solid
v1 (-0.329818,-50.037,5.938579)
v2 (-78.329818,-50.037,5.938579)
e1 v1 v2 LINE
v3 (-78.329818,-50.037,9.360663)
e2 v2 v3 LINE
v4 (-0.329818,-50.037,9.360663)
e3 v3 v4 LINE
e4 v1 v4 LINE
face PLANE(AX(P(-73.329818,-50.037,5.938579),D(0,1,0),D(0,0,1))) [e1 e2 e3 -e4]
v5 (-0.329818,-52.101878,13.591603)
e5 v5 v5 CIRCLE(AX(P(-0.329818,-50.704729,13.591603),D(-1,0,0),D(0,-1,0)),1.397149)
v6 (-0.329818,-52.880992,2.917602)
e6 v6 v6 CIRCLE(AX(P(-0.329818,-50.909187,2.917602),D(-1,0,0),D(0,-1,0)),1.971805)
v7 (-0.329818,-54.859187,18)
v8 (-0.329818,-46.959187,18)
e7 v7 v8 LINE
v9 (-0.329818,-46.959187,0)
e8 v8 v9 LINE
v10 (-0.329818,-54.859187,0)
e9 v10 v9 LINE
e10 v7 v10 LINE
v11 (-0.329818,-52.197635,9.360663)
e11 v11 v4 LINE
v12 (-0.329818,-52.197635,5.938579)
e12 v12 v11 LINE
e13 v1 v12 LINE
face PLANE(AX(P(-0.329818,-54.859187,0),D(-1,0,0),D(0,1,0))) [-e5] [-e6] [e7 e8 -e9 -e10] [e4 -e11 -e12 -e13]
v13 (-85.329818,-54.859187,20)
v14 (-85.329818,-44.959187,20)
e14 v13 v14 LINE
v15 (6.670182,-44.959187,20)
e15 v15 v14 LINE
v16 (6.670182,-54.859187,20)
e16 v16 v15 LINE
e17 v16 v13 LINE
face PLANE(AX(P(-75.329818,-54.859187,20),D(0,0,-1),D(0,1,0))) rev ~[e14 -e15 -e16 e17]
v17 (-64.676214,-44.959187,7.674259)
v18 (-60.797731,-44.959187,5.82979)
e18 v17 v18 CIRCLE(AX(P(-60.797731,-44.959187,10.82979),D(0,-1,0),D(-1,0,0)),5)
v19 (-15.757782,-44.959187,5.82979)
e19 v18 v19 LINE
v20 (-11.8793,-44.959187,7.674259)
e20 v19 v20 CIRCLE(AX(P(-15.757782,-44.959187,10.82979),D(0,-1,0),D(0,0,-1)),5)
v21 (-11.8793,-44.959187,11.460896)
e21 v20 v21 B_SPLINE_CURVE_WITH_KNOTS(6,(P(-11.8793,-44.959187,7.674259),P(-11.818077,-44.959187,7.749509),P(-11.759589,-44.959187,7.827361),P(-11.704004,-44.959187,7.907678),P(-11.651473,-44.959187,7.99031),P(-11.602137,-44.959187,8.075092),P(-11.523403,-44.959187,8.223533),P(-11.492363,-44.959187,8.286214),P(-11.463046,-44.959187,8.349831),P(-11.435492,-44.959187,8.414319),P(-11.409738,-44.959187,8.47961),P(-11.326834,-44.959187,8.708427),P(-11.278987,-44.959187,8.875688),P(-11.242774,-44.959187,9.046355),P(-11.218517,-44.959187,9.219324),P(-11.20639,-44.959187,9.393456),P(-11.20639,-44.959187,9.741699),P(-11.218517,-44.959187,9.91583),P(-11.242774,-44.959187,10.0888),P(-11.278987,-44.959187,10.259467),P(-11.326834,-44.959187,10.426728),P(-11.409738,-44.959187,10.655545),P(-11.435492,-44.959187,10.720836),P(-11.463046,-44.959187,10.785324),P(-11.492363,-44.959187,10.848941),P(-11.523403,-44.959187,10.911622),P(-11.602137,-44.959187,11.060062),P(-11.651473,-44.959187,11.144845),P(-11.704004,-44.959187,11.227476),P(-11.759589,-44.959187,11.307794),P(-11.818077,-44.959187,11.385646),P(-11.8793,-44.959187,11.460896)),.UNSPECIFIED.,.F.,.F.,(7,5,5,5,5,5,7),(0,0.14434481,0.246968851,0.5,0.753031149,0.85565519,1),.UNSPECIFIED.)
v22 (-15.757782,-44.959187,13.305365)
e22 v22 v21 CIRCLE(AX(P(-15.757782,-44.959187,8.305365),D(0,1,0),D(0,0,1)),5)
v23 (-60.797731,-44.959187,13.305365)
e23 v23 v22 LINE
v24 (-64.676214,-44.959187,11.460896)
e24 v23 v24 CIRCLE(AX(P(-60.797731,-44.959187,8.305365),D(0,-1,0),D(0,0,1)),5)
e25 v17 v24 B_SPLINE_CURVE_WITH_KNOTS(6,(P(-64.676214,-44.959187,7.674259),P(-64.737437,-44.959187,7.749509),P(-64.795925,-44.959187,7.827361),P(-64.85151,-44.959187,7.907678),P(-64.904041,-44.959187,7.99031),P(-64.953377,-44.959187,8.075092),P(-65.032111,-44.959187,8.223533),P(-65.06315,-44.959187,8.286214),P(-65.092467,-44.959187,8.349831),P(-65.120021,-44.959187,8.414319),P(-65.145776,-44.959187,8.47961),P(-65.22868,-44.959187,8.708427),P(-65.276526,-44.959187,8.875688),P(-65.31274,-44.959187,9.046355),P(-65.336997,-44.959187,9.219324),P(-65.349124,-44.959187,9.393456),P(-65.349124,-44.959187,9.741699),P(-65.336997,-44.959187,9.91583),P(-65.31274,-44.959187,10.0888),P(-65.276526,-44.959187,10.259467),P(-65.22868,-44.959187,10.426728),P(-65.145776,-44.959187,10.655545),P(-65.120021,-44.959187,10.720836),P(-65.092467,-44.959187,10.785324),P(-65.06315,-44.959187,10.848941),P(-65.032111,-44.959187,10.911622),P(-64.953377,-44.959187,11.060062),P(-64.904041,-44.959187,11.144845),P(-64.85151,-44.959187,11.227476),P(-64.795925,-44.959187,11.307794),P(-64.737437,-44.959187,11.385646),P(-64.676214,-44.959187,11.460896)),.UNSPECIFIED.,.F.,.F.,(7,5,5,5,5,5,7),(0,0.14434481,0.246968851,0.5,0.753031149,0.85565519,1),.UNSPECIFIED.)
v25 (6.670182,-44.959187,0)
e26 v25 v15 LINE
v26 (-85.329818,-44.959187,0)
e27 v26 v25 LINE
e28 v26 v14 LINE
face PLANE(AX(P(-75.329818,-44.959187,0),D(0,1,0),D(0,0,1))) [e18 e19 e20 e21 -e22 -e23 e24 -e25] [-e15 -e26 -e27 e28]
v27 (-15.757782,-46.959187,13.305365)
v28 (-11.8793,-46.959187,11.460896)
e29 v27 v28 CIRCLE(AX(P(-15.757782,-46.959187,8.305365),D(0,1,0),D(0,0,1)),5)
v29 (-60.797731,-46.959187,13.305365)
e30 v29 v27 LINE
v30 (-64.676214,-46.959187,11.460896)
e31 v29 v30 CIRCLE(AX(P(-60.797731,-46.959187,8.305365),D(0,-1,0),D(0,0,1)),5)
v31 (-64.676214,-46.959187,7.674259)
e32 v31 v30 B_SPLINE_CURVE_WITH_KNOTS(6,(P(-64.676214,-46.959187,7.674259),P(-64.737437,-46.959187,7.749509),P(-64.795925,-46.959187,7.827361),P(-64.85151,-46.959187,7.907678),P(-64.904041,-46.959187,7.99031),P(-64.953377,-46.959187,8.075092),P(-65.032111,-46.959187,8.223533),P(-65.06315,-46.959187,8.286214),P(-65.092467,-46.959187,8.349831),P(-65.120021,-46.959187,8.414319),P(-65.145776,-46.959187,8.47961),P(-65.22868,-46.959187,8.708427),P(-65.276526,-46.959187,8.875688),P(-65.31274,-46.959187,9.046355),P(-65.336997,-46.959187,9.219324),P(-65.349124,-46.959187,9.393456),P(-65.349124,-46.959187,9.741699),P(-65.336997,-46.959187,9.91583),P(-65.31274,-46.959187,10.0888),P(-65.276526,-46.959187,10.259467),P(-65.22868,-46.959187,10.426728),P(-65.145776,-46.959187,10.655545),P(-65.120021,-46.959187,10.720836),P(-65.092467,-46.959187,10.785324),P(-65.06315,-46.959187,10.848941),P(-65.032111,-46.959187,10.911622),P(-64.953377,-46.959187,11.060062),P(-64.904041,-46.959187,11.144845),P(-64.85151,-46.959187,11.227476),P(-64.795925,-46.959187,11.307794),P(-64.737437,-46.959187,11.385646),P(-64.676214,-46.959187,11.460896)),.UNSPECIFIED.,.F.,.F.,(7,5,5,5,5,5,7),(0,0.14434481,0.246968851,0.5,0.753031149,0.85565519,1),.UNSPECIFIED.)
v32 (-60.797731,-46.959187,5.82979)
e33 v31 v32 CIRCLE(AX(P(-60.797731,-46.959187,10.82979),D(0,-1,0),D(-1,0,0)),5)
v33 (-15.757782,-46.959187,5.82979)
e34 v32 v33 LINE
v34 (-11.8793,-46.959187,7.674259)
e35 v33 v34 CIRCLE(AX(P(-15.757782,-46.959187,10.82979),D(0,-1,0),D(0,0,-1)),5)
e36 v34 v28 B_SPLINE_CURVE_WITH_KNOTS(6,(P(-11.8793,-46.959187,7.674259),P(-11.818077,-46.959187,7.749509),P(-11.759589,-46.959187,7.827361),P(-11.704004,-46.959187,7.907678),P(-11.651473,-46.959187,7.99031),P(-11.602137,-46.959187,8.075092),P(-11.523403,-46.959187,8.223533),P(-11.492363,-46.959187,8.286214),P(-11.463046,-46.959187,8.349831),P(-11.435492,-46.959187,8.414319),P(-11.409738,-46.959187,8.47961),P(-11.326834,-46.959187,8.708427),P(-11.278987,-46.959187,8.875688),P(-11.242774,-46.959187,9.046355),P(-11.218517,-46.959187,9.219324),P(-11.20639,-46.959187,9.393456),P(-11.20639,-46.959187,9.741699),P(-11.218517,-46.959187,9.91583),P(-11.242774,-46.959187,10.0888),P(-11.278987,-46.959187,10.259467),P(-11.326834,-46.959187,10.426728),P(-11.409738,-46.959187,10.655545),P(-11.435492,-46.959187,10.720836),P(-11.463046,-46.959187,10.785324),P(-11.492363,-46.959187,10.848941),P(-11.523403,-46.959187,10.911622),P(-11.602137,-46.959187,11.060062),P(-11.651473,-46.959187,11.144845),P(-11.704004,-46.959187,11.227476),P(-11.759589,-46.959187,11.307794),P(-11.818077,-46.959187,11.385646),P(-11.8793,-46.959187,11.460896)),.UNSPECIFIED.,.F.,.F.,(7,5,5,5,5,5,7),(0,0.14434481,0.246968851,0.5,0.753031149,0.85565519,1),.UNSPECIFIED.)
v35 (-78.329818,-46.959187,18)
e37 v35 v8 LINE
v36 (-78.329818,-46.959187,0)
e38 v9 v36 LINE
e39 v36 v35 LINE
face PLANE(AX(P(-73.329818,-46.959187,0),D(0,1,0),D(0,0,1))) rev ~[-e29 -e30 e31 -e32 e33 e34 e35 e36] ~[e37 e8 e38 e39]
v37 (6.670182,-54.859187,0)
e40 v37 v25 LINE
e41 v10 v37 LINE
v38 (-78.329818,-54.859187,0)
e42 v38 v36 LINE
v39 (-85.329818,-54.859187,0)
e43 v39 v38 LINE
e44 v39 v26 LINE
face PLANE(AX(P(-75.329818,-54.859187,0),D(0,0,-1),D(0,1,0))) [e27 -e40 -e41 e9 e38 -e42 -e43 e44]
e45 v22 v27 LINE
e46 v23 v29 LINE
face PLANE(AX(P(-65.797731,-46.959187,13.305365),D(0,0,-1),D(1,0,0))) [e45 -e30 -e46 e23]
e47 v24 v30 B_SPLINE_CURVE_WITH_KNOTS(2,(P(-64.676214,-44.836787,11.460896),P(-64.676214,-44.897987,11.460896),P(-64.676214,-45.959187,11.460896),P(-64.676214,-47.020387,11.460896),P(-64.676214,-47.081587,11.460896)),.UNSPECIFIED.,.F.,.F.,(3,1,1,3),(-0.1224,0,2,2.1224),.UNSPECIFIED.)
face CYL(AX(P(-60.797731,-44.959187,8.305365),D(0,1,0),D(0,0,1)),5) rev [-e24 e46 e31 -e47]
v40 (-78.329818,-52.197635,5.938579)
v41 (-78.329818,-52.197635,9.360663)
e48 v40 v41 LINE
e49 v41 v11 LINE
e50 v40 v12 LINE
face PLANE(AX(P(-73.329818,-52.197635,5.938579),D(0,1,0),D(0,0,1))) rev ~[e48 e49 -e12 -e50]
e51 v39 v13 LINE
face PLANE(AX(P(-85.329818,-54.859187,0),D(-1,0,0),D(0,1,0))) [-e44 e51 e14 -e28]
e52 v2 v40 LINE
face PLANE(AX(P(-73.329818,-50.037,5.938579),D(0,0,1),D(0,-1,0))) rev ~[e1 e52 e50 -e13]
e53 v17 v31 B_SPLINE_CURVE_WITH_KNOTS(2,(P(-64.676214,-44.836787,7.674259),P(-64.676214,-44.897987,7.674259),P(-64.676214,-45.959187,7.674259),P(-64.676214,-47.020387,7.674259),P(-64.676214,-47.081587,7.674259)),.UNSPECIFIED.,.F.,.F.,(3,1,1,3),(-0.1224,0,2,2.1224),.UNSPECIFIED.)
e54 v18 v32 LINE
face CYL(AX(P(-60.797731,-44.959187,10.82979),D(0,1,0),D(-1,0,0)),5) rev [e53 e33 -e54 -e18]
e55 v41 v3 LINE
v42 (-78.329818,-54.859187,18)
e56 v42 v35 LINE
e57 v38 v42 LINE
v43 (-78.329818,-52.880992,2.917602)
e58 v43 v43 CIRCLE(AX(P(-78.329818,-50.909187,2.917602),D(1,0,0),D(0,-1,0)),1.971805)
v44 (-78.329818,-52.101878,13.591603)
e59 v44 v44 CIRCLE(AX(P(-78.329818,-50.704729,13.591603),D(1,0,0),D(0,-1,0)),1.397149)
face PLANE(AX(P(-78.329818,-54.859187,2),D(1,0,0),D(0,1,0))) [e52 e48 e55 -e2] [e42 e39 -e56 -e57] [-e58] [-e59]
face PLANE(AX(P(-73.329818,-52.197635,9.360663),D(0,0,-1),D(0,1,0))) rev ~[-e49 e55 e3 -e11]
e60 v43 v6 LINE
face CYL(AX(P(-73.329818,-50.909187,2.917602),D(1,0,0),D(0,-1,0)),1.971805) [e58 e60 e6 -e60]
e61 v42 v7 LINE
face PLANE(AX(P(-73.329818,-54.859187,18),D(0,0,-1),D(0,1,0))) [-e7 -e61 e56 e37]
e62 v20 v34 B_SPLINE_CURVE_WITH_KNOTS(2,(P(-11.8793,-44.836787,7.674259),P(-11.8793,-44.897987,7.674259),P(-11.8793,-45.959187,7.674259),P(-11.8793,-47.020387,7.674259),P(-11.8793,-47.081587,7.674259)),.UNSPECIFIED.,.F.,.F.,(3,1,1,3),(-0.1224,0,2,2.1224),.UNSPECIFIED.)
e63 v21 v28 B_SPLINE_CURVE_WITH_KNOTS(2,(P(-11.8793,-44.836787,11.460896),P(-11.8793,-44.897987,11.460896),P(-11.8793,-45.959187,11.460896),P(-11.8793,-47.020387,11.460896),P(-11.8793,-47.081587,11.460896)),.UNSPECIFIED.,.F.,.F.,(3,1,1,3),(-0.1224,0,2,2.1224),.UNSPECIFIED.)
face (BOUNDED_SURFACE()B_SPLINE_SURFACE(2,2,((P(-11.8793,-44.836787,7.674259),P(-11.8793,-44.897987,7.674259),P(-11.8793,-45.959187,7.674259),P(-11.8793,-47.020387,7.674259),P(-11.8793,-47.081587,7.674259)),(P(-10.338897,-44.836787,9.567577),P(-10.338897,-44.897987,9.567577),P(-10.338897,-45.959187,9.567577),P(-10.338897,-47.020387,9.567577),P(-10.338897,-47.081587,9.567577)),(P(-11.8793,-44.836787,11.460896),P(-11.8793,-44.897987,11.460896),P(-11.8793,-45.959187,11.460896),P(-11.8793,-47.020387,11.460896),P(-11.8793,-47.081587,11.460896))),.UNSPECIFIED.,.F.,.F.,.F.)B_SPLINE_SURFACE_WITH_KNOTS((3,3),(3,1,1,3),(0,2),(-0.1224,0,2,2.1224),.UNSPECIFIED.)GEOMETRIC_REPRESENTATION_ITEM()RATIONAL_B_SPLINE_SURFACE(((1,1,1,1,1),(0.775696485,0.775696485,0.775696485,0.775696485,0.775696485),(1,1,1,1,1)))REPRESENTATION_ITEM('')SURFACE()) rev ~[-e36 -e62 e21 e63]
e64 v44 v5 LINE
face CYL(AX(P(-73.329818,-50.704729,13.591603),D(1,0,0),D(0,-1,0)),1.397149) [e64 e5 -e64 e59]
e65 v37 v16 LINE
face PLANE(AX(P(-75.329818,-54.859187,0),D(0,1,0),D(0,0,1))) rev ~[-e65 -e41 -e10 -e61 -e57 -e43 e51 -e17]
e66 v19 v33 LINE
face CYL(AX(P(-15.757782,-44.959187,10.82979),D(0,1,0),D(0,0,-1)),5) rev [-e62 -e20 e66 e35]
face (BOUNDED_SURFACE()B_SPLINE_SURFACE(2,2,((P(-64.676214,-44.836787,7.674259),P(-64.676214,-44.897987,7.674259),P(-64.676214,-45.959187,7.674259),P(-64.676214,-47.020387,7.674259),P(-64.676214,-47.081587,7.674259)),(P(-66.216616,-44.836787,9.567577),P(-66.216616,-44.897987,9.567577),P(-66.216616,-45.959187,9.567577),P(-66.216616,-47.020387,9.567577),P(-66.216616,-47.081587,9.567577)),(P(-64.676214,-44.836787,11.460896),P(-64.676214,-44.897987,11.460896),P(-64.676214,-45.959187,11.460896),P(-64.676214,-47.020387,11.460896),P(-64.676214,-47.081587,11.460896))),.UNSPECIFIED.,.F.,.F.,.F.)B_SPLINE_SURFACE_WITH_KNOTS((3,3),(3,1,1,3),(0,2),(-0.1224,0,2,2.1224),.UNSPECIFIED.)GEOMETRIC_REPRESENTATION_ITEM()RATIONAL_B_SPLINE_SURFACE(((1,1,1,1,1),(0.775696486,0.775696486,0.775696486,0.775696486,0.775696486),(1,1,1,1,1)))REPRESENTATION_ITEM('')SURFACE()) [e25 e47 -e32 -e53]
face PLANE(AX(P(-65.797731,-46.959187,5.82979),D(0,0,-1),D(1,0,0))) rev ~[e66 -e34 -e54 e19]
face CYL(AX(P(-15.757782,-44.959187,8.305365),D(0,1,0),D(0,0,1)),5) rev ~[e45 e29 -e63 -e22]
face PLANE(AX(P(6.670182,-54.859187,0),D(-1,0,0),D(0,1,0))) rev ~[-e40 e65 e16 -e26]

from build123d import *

# Parameters (mm, degrees)
F0_W         = 82
F0_H         = 9.9
F1_DEPTH     = 20
F2_T         = -2
F3_DEPTH     = 2
F4_DEPTH     = 5
F6_R         = 1.3971487494
F5_R         = 1.9718048452
F7_DEPTH     = 74
F8_W         = 55.0399487838
F8_H         = 7.4755754322
F9_DEPTH     = 2
F10_T1_DEPTH = 2
F11_R        = 3
F12_W        = 1.8215961754
F12_H        = 3.4220837988
F13_DEPTH    = 1
F14_T4_DEPTH = 3.4220837988
F14_T9_DEPTH = 3.4220837988
F15_R        = 0.7
F16_W        = 0.433061509
F16_H        = 3.4220837988
F16_W_2      = 1.2856977906
F16_W_3      = 0.4418755459
F17_DEPTH    = 73
F19_DEPTH    = 10
F20_DEPTH    = 5


# Not quite as in the source:
# - a fillet or chamfer that OpenCascade refuses, or shapes differently, is made with other operations: its cross-section is extruded or revolved along the edge and cut away or added
# - a feature of the source that left no trace in its solid (it failed there, or was rolled back) is left out


with BuildPart() as f1:
    # F0 (on Top) → F1 (new body)
    with BuildSketch(Plane.XY):
        with Locations((-34.3298178315, -49.909187454)):
            Rectangle(F0_W, F0_H)
    extrude(amount=F1_DEPTH)

    # F2
    f2_openings = [f1.faces().sort_by_distance(p)[0] for p in [
        (-34.329818, -54.859187, 10),
    ]]
    offset(amount=F2_T, openings=f2_openings)

    # F3 (cut): a face of the model
    f3_faces = [f1.faces().sort_by_distance(p)[0] for p in [
        (-34.3298178315, -50.909187454, 2),
    ]]
    extrude(f3_faces, amount=-F3_DEPTH, mode=Mode.SUBTRACT)

    # F4 (add): a face of the model
    f4_faces = [f1.faces().sort_by_distance(p)[0] for p in [
        (4.6701821685, -50.909187454, 9),
    ]]
    extrude(f4_faces, amount=F4_DEPTH)

    # F6 (on face) + F5 (on face) → F7 (join)
    with BuildSketch(Plane(origin=(-0.3298178315, 0, 0), x_dir=(0, -1, 0), z_dir=(-1, 0, 0))):
        with Locations((50.704728812, 13.591603376)):
            Circle(F6_R)
    with BuildSketch(Plane(origin=(-0.3298178315, 0, 0), x_dir=(0, -1, 0), z_dir=(-1, 0, 0))):
        with Locations((50.909187454, 2.9176021926)):
            Circle(F5_R)
    extrude(amount=F7_DEPTH)

    # F8 (on face) → F9 (cut)
    with BuildSketch(Plane.XZ.offset(46.959187454)):
        with Locations((-38.2777568884, 9.5675773919)):
            Rectangle(F8_W, F8_H)
    extrude(amount=-F9_DEPTH, mode=Mode.SUBTRACT)

    # F10: fillet of radius 5 on 4 edges, made by hand

    # F10_s2 → F10_t1 (join)
    with BuildSketch(Plane.XZ.offset(44.959187454)):
        with BuildLine():
            ThreePointArc((-15.7577824965, 5.8297896758), (-12.2222485906, 7.2942557698), (-10.7577824965, 10.8297896758))
            Line((-10.7577824965, 10.8297896758), (-10.7577824965, 5.8297896758))
            Line((-10.7577824965, 5.8297896758), (-15.7577824965, 5.8297896758))
        make_face()
        with BuildLine():
            ThreePointArc((-65.7977312803, 10.8297896758), (-64.3332651863, 7.2942557698), (-60.7977312803, 5.8297896758))
            Line((-60.7977312803, 5.8297896758), (-65.7977312803, 5.8297896758))
            Line((-65.7977312803, 5.8297896758), (-65.7977312803, 10.8297896758))
        make_face()
        with BuildLine():
            ThreePointArc((-60.7977312803, 13.305365108), (-64.3332651863, 11.8408990139), (-65.7977312803, 8.305365108))
            Line((-65.7977312803, 8.305365108), (-65.7977312803, 13.305365108))
            Line((-65.7977312803, 13.305365108), (-60.7977312803, 13.305365108))
        make_face()
        with BuildLine():
            ThreePointArc((-15.7577824965, 13.305365108), (-12.2222485906, 11.8408990139), (-10.7577824965, 8.305365108))
            Line((-10.7577824965, 8.305365108), (-10.7577824965, 13.305365108))
            Line((-10.7577824965, 13.305365108), (-15.7577824965, 13.305365108))
        make_face()
    extrude(amount=F10_T1_DEPTH)

    # F11
    f11_edges = [f1.edges().sort_by_distance(p)[0] for p in [
        (-10.919723, -45.959187, 9.567577),
        (-65.635791, -45.959187, 9.567577),
    ]]
    fillet(f11_edges, radius=F11_R)

    # F12 (on face) → F13 (join)
    with BuildSketch(Plane(origin=(-0.3298178315, 0, 0), x_dir=(0, -1, 0), z_dir=(-1, 0, 0))):
        with Locations((51.1129107326, 7.6496207621)):
            Rectangle(F12_W, F12_H)
    extrude(amount=F13_DEPTH)

    # F14: fillet of radius 2 on 2 edges, made by hand


with BuildPart() as f14_tool2:
    # F14_s3 → F14_t4 (new body)
    with BuildSketch(Plane.XY.offset(5.9385788627)):
        with BuildLine():
            ThreePointArc((0.6701821685, -52.0237088203), (-0.7440313939, -51.4379223827), (-1.3298178315, -50.0237088203))
            Line((-1.3298178315, -50.0237088203), (-1.3698178315, -50.0237088203))
            Line((-1.3698178315, -50.0237088203), (-1.3698178315, -52.0637088203))
            Line((-1.3698178315, -52.0637088203), (0.6701821685, -52.0637088203))
            Line((0.6701821685, -52.0637088203), (0.6701821685, -52.0237088203))
        make_face()
    extrude(amount=F14_T4_DEPTH)

    split(bisect_by=Plane.YZ.offset(-0.3298178315), keep=Keep.BOTTOM)


with BuildPart() as f1_1:
    add(f1.part)

    # F14_t1: cut F14_tool2
    add(f14_tool2.part, mode=Mode.SUBTRACT)


with BuildPart() as f14_tool7:
    # F14_s8 → F14_t9 (new body)
    with BuildSketch(Plane.XY.offset(9.3606626615)):
        with BuildLine():
            ThreePointArc((0.6701821685, -50.2021126449), (-0.7440313939, -50.7878990825), (-1.3298178315, -52.2021126449))
            Line((-1.3298178315, -52.2021126449), (-1.3698178315, -52.2021126449))
            Line((-1.3698178315, -52.2021126449), (-1.3698178315, -50.1621126449))
            Line((-1.3698178315, -50.1621126449), (0.6701821685, -50.1621126449))
            Line((0.6701821685, -50.1621126449), (0.6701821685, -50.2021126449))
        make_face()
    extrude(amount=-F14_T9_DEPTH)

    split(bisect_by=Plane.YZ.offset(-0.3298178315), keep=Keep.BOTTOM)


with BuildPart() as f1_2:
    add(f1_1.part)

    # F14_t6: cut F14_tool7
    add(f14_tool7.part, mode=Mode.SUBTRACT)

    # F15
    f15_edges = [f1_2.edges().sort_by_distance(p)[0] for p in [
        (-1.007208, -51.112911, 7.649621),
    ]]
    fillet(f15_edges, radius=F15_R)

    # F16 (on face) → F17 (join)
    with BuildSketch(Plane(origin=(-0.3298178315, 0, 0), x_dir=(0, -1, 0), z_dir=(-1, 0, 0))):
        with Locations((50.2535310828, 7.6496207621)):
            Rectangle(F16_W, F16_H)
        with Locations((51.1129107326, 7.6496207621)):
            Rectangle(F16_W_2, F16_H)
        with Locations((51.9766974008, 7.6496207621)):
            Rectangle(F16_W_3, F16_H)
    extrude(amount=F17_DEPTH)

    # F19 (add): a face of the model
    f19_faces = [f1_2.faces().sort_by_distance(p)[0] for p in [
        (-75.3298178315, -49.909187454, 10),
    ]]
    extrude(f19_faces, amount=F19_DEPTH)

    # F20 (cut): a face of the model
    f20_faces = [f1_2.faces().sort_by_distance(p)[0] for p in [
        (-73.3298178315, -50.9067397847, 9.4818900009),
    ]]
    extrude(f20_faces, amount=-F20_DEPTH, mode=Mode.SUBTRACT)


solid = f1_2.part
